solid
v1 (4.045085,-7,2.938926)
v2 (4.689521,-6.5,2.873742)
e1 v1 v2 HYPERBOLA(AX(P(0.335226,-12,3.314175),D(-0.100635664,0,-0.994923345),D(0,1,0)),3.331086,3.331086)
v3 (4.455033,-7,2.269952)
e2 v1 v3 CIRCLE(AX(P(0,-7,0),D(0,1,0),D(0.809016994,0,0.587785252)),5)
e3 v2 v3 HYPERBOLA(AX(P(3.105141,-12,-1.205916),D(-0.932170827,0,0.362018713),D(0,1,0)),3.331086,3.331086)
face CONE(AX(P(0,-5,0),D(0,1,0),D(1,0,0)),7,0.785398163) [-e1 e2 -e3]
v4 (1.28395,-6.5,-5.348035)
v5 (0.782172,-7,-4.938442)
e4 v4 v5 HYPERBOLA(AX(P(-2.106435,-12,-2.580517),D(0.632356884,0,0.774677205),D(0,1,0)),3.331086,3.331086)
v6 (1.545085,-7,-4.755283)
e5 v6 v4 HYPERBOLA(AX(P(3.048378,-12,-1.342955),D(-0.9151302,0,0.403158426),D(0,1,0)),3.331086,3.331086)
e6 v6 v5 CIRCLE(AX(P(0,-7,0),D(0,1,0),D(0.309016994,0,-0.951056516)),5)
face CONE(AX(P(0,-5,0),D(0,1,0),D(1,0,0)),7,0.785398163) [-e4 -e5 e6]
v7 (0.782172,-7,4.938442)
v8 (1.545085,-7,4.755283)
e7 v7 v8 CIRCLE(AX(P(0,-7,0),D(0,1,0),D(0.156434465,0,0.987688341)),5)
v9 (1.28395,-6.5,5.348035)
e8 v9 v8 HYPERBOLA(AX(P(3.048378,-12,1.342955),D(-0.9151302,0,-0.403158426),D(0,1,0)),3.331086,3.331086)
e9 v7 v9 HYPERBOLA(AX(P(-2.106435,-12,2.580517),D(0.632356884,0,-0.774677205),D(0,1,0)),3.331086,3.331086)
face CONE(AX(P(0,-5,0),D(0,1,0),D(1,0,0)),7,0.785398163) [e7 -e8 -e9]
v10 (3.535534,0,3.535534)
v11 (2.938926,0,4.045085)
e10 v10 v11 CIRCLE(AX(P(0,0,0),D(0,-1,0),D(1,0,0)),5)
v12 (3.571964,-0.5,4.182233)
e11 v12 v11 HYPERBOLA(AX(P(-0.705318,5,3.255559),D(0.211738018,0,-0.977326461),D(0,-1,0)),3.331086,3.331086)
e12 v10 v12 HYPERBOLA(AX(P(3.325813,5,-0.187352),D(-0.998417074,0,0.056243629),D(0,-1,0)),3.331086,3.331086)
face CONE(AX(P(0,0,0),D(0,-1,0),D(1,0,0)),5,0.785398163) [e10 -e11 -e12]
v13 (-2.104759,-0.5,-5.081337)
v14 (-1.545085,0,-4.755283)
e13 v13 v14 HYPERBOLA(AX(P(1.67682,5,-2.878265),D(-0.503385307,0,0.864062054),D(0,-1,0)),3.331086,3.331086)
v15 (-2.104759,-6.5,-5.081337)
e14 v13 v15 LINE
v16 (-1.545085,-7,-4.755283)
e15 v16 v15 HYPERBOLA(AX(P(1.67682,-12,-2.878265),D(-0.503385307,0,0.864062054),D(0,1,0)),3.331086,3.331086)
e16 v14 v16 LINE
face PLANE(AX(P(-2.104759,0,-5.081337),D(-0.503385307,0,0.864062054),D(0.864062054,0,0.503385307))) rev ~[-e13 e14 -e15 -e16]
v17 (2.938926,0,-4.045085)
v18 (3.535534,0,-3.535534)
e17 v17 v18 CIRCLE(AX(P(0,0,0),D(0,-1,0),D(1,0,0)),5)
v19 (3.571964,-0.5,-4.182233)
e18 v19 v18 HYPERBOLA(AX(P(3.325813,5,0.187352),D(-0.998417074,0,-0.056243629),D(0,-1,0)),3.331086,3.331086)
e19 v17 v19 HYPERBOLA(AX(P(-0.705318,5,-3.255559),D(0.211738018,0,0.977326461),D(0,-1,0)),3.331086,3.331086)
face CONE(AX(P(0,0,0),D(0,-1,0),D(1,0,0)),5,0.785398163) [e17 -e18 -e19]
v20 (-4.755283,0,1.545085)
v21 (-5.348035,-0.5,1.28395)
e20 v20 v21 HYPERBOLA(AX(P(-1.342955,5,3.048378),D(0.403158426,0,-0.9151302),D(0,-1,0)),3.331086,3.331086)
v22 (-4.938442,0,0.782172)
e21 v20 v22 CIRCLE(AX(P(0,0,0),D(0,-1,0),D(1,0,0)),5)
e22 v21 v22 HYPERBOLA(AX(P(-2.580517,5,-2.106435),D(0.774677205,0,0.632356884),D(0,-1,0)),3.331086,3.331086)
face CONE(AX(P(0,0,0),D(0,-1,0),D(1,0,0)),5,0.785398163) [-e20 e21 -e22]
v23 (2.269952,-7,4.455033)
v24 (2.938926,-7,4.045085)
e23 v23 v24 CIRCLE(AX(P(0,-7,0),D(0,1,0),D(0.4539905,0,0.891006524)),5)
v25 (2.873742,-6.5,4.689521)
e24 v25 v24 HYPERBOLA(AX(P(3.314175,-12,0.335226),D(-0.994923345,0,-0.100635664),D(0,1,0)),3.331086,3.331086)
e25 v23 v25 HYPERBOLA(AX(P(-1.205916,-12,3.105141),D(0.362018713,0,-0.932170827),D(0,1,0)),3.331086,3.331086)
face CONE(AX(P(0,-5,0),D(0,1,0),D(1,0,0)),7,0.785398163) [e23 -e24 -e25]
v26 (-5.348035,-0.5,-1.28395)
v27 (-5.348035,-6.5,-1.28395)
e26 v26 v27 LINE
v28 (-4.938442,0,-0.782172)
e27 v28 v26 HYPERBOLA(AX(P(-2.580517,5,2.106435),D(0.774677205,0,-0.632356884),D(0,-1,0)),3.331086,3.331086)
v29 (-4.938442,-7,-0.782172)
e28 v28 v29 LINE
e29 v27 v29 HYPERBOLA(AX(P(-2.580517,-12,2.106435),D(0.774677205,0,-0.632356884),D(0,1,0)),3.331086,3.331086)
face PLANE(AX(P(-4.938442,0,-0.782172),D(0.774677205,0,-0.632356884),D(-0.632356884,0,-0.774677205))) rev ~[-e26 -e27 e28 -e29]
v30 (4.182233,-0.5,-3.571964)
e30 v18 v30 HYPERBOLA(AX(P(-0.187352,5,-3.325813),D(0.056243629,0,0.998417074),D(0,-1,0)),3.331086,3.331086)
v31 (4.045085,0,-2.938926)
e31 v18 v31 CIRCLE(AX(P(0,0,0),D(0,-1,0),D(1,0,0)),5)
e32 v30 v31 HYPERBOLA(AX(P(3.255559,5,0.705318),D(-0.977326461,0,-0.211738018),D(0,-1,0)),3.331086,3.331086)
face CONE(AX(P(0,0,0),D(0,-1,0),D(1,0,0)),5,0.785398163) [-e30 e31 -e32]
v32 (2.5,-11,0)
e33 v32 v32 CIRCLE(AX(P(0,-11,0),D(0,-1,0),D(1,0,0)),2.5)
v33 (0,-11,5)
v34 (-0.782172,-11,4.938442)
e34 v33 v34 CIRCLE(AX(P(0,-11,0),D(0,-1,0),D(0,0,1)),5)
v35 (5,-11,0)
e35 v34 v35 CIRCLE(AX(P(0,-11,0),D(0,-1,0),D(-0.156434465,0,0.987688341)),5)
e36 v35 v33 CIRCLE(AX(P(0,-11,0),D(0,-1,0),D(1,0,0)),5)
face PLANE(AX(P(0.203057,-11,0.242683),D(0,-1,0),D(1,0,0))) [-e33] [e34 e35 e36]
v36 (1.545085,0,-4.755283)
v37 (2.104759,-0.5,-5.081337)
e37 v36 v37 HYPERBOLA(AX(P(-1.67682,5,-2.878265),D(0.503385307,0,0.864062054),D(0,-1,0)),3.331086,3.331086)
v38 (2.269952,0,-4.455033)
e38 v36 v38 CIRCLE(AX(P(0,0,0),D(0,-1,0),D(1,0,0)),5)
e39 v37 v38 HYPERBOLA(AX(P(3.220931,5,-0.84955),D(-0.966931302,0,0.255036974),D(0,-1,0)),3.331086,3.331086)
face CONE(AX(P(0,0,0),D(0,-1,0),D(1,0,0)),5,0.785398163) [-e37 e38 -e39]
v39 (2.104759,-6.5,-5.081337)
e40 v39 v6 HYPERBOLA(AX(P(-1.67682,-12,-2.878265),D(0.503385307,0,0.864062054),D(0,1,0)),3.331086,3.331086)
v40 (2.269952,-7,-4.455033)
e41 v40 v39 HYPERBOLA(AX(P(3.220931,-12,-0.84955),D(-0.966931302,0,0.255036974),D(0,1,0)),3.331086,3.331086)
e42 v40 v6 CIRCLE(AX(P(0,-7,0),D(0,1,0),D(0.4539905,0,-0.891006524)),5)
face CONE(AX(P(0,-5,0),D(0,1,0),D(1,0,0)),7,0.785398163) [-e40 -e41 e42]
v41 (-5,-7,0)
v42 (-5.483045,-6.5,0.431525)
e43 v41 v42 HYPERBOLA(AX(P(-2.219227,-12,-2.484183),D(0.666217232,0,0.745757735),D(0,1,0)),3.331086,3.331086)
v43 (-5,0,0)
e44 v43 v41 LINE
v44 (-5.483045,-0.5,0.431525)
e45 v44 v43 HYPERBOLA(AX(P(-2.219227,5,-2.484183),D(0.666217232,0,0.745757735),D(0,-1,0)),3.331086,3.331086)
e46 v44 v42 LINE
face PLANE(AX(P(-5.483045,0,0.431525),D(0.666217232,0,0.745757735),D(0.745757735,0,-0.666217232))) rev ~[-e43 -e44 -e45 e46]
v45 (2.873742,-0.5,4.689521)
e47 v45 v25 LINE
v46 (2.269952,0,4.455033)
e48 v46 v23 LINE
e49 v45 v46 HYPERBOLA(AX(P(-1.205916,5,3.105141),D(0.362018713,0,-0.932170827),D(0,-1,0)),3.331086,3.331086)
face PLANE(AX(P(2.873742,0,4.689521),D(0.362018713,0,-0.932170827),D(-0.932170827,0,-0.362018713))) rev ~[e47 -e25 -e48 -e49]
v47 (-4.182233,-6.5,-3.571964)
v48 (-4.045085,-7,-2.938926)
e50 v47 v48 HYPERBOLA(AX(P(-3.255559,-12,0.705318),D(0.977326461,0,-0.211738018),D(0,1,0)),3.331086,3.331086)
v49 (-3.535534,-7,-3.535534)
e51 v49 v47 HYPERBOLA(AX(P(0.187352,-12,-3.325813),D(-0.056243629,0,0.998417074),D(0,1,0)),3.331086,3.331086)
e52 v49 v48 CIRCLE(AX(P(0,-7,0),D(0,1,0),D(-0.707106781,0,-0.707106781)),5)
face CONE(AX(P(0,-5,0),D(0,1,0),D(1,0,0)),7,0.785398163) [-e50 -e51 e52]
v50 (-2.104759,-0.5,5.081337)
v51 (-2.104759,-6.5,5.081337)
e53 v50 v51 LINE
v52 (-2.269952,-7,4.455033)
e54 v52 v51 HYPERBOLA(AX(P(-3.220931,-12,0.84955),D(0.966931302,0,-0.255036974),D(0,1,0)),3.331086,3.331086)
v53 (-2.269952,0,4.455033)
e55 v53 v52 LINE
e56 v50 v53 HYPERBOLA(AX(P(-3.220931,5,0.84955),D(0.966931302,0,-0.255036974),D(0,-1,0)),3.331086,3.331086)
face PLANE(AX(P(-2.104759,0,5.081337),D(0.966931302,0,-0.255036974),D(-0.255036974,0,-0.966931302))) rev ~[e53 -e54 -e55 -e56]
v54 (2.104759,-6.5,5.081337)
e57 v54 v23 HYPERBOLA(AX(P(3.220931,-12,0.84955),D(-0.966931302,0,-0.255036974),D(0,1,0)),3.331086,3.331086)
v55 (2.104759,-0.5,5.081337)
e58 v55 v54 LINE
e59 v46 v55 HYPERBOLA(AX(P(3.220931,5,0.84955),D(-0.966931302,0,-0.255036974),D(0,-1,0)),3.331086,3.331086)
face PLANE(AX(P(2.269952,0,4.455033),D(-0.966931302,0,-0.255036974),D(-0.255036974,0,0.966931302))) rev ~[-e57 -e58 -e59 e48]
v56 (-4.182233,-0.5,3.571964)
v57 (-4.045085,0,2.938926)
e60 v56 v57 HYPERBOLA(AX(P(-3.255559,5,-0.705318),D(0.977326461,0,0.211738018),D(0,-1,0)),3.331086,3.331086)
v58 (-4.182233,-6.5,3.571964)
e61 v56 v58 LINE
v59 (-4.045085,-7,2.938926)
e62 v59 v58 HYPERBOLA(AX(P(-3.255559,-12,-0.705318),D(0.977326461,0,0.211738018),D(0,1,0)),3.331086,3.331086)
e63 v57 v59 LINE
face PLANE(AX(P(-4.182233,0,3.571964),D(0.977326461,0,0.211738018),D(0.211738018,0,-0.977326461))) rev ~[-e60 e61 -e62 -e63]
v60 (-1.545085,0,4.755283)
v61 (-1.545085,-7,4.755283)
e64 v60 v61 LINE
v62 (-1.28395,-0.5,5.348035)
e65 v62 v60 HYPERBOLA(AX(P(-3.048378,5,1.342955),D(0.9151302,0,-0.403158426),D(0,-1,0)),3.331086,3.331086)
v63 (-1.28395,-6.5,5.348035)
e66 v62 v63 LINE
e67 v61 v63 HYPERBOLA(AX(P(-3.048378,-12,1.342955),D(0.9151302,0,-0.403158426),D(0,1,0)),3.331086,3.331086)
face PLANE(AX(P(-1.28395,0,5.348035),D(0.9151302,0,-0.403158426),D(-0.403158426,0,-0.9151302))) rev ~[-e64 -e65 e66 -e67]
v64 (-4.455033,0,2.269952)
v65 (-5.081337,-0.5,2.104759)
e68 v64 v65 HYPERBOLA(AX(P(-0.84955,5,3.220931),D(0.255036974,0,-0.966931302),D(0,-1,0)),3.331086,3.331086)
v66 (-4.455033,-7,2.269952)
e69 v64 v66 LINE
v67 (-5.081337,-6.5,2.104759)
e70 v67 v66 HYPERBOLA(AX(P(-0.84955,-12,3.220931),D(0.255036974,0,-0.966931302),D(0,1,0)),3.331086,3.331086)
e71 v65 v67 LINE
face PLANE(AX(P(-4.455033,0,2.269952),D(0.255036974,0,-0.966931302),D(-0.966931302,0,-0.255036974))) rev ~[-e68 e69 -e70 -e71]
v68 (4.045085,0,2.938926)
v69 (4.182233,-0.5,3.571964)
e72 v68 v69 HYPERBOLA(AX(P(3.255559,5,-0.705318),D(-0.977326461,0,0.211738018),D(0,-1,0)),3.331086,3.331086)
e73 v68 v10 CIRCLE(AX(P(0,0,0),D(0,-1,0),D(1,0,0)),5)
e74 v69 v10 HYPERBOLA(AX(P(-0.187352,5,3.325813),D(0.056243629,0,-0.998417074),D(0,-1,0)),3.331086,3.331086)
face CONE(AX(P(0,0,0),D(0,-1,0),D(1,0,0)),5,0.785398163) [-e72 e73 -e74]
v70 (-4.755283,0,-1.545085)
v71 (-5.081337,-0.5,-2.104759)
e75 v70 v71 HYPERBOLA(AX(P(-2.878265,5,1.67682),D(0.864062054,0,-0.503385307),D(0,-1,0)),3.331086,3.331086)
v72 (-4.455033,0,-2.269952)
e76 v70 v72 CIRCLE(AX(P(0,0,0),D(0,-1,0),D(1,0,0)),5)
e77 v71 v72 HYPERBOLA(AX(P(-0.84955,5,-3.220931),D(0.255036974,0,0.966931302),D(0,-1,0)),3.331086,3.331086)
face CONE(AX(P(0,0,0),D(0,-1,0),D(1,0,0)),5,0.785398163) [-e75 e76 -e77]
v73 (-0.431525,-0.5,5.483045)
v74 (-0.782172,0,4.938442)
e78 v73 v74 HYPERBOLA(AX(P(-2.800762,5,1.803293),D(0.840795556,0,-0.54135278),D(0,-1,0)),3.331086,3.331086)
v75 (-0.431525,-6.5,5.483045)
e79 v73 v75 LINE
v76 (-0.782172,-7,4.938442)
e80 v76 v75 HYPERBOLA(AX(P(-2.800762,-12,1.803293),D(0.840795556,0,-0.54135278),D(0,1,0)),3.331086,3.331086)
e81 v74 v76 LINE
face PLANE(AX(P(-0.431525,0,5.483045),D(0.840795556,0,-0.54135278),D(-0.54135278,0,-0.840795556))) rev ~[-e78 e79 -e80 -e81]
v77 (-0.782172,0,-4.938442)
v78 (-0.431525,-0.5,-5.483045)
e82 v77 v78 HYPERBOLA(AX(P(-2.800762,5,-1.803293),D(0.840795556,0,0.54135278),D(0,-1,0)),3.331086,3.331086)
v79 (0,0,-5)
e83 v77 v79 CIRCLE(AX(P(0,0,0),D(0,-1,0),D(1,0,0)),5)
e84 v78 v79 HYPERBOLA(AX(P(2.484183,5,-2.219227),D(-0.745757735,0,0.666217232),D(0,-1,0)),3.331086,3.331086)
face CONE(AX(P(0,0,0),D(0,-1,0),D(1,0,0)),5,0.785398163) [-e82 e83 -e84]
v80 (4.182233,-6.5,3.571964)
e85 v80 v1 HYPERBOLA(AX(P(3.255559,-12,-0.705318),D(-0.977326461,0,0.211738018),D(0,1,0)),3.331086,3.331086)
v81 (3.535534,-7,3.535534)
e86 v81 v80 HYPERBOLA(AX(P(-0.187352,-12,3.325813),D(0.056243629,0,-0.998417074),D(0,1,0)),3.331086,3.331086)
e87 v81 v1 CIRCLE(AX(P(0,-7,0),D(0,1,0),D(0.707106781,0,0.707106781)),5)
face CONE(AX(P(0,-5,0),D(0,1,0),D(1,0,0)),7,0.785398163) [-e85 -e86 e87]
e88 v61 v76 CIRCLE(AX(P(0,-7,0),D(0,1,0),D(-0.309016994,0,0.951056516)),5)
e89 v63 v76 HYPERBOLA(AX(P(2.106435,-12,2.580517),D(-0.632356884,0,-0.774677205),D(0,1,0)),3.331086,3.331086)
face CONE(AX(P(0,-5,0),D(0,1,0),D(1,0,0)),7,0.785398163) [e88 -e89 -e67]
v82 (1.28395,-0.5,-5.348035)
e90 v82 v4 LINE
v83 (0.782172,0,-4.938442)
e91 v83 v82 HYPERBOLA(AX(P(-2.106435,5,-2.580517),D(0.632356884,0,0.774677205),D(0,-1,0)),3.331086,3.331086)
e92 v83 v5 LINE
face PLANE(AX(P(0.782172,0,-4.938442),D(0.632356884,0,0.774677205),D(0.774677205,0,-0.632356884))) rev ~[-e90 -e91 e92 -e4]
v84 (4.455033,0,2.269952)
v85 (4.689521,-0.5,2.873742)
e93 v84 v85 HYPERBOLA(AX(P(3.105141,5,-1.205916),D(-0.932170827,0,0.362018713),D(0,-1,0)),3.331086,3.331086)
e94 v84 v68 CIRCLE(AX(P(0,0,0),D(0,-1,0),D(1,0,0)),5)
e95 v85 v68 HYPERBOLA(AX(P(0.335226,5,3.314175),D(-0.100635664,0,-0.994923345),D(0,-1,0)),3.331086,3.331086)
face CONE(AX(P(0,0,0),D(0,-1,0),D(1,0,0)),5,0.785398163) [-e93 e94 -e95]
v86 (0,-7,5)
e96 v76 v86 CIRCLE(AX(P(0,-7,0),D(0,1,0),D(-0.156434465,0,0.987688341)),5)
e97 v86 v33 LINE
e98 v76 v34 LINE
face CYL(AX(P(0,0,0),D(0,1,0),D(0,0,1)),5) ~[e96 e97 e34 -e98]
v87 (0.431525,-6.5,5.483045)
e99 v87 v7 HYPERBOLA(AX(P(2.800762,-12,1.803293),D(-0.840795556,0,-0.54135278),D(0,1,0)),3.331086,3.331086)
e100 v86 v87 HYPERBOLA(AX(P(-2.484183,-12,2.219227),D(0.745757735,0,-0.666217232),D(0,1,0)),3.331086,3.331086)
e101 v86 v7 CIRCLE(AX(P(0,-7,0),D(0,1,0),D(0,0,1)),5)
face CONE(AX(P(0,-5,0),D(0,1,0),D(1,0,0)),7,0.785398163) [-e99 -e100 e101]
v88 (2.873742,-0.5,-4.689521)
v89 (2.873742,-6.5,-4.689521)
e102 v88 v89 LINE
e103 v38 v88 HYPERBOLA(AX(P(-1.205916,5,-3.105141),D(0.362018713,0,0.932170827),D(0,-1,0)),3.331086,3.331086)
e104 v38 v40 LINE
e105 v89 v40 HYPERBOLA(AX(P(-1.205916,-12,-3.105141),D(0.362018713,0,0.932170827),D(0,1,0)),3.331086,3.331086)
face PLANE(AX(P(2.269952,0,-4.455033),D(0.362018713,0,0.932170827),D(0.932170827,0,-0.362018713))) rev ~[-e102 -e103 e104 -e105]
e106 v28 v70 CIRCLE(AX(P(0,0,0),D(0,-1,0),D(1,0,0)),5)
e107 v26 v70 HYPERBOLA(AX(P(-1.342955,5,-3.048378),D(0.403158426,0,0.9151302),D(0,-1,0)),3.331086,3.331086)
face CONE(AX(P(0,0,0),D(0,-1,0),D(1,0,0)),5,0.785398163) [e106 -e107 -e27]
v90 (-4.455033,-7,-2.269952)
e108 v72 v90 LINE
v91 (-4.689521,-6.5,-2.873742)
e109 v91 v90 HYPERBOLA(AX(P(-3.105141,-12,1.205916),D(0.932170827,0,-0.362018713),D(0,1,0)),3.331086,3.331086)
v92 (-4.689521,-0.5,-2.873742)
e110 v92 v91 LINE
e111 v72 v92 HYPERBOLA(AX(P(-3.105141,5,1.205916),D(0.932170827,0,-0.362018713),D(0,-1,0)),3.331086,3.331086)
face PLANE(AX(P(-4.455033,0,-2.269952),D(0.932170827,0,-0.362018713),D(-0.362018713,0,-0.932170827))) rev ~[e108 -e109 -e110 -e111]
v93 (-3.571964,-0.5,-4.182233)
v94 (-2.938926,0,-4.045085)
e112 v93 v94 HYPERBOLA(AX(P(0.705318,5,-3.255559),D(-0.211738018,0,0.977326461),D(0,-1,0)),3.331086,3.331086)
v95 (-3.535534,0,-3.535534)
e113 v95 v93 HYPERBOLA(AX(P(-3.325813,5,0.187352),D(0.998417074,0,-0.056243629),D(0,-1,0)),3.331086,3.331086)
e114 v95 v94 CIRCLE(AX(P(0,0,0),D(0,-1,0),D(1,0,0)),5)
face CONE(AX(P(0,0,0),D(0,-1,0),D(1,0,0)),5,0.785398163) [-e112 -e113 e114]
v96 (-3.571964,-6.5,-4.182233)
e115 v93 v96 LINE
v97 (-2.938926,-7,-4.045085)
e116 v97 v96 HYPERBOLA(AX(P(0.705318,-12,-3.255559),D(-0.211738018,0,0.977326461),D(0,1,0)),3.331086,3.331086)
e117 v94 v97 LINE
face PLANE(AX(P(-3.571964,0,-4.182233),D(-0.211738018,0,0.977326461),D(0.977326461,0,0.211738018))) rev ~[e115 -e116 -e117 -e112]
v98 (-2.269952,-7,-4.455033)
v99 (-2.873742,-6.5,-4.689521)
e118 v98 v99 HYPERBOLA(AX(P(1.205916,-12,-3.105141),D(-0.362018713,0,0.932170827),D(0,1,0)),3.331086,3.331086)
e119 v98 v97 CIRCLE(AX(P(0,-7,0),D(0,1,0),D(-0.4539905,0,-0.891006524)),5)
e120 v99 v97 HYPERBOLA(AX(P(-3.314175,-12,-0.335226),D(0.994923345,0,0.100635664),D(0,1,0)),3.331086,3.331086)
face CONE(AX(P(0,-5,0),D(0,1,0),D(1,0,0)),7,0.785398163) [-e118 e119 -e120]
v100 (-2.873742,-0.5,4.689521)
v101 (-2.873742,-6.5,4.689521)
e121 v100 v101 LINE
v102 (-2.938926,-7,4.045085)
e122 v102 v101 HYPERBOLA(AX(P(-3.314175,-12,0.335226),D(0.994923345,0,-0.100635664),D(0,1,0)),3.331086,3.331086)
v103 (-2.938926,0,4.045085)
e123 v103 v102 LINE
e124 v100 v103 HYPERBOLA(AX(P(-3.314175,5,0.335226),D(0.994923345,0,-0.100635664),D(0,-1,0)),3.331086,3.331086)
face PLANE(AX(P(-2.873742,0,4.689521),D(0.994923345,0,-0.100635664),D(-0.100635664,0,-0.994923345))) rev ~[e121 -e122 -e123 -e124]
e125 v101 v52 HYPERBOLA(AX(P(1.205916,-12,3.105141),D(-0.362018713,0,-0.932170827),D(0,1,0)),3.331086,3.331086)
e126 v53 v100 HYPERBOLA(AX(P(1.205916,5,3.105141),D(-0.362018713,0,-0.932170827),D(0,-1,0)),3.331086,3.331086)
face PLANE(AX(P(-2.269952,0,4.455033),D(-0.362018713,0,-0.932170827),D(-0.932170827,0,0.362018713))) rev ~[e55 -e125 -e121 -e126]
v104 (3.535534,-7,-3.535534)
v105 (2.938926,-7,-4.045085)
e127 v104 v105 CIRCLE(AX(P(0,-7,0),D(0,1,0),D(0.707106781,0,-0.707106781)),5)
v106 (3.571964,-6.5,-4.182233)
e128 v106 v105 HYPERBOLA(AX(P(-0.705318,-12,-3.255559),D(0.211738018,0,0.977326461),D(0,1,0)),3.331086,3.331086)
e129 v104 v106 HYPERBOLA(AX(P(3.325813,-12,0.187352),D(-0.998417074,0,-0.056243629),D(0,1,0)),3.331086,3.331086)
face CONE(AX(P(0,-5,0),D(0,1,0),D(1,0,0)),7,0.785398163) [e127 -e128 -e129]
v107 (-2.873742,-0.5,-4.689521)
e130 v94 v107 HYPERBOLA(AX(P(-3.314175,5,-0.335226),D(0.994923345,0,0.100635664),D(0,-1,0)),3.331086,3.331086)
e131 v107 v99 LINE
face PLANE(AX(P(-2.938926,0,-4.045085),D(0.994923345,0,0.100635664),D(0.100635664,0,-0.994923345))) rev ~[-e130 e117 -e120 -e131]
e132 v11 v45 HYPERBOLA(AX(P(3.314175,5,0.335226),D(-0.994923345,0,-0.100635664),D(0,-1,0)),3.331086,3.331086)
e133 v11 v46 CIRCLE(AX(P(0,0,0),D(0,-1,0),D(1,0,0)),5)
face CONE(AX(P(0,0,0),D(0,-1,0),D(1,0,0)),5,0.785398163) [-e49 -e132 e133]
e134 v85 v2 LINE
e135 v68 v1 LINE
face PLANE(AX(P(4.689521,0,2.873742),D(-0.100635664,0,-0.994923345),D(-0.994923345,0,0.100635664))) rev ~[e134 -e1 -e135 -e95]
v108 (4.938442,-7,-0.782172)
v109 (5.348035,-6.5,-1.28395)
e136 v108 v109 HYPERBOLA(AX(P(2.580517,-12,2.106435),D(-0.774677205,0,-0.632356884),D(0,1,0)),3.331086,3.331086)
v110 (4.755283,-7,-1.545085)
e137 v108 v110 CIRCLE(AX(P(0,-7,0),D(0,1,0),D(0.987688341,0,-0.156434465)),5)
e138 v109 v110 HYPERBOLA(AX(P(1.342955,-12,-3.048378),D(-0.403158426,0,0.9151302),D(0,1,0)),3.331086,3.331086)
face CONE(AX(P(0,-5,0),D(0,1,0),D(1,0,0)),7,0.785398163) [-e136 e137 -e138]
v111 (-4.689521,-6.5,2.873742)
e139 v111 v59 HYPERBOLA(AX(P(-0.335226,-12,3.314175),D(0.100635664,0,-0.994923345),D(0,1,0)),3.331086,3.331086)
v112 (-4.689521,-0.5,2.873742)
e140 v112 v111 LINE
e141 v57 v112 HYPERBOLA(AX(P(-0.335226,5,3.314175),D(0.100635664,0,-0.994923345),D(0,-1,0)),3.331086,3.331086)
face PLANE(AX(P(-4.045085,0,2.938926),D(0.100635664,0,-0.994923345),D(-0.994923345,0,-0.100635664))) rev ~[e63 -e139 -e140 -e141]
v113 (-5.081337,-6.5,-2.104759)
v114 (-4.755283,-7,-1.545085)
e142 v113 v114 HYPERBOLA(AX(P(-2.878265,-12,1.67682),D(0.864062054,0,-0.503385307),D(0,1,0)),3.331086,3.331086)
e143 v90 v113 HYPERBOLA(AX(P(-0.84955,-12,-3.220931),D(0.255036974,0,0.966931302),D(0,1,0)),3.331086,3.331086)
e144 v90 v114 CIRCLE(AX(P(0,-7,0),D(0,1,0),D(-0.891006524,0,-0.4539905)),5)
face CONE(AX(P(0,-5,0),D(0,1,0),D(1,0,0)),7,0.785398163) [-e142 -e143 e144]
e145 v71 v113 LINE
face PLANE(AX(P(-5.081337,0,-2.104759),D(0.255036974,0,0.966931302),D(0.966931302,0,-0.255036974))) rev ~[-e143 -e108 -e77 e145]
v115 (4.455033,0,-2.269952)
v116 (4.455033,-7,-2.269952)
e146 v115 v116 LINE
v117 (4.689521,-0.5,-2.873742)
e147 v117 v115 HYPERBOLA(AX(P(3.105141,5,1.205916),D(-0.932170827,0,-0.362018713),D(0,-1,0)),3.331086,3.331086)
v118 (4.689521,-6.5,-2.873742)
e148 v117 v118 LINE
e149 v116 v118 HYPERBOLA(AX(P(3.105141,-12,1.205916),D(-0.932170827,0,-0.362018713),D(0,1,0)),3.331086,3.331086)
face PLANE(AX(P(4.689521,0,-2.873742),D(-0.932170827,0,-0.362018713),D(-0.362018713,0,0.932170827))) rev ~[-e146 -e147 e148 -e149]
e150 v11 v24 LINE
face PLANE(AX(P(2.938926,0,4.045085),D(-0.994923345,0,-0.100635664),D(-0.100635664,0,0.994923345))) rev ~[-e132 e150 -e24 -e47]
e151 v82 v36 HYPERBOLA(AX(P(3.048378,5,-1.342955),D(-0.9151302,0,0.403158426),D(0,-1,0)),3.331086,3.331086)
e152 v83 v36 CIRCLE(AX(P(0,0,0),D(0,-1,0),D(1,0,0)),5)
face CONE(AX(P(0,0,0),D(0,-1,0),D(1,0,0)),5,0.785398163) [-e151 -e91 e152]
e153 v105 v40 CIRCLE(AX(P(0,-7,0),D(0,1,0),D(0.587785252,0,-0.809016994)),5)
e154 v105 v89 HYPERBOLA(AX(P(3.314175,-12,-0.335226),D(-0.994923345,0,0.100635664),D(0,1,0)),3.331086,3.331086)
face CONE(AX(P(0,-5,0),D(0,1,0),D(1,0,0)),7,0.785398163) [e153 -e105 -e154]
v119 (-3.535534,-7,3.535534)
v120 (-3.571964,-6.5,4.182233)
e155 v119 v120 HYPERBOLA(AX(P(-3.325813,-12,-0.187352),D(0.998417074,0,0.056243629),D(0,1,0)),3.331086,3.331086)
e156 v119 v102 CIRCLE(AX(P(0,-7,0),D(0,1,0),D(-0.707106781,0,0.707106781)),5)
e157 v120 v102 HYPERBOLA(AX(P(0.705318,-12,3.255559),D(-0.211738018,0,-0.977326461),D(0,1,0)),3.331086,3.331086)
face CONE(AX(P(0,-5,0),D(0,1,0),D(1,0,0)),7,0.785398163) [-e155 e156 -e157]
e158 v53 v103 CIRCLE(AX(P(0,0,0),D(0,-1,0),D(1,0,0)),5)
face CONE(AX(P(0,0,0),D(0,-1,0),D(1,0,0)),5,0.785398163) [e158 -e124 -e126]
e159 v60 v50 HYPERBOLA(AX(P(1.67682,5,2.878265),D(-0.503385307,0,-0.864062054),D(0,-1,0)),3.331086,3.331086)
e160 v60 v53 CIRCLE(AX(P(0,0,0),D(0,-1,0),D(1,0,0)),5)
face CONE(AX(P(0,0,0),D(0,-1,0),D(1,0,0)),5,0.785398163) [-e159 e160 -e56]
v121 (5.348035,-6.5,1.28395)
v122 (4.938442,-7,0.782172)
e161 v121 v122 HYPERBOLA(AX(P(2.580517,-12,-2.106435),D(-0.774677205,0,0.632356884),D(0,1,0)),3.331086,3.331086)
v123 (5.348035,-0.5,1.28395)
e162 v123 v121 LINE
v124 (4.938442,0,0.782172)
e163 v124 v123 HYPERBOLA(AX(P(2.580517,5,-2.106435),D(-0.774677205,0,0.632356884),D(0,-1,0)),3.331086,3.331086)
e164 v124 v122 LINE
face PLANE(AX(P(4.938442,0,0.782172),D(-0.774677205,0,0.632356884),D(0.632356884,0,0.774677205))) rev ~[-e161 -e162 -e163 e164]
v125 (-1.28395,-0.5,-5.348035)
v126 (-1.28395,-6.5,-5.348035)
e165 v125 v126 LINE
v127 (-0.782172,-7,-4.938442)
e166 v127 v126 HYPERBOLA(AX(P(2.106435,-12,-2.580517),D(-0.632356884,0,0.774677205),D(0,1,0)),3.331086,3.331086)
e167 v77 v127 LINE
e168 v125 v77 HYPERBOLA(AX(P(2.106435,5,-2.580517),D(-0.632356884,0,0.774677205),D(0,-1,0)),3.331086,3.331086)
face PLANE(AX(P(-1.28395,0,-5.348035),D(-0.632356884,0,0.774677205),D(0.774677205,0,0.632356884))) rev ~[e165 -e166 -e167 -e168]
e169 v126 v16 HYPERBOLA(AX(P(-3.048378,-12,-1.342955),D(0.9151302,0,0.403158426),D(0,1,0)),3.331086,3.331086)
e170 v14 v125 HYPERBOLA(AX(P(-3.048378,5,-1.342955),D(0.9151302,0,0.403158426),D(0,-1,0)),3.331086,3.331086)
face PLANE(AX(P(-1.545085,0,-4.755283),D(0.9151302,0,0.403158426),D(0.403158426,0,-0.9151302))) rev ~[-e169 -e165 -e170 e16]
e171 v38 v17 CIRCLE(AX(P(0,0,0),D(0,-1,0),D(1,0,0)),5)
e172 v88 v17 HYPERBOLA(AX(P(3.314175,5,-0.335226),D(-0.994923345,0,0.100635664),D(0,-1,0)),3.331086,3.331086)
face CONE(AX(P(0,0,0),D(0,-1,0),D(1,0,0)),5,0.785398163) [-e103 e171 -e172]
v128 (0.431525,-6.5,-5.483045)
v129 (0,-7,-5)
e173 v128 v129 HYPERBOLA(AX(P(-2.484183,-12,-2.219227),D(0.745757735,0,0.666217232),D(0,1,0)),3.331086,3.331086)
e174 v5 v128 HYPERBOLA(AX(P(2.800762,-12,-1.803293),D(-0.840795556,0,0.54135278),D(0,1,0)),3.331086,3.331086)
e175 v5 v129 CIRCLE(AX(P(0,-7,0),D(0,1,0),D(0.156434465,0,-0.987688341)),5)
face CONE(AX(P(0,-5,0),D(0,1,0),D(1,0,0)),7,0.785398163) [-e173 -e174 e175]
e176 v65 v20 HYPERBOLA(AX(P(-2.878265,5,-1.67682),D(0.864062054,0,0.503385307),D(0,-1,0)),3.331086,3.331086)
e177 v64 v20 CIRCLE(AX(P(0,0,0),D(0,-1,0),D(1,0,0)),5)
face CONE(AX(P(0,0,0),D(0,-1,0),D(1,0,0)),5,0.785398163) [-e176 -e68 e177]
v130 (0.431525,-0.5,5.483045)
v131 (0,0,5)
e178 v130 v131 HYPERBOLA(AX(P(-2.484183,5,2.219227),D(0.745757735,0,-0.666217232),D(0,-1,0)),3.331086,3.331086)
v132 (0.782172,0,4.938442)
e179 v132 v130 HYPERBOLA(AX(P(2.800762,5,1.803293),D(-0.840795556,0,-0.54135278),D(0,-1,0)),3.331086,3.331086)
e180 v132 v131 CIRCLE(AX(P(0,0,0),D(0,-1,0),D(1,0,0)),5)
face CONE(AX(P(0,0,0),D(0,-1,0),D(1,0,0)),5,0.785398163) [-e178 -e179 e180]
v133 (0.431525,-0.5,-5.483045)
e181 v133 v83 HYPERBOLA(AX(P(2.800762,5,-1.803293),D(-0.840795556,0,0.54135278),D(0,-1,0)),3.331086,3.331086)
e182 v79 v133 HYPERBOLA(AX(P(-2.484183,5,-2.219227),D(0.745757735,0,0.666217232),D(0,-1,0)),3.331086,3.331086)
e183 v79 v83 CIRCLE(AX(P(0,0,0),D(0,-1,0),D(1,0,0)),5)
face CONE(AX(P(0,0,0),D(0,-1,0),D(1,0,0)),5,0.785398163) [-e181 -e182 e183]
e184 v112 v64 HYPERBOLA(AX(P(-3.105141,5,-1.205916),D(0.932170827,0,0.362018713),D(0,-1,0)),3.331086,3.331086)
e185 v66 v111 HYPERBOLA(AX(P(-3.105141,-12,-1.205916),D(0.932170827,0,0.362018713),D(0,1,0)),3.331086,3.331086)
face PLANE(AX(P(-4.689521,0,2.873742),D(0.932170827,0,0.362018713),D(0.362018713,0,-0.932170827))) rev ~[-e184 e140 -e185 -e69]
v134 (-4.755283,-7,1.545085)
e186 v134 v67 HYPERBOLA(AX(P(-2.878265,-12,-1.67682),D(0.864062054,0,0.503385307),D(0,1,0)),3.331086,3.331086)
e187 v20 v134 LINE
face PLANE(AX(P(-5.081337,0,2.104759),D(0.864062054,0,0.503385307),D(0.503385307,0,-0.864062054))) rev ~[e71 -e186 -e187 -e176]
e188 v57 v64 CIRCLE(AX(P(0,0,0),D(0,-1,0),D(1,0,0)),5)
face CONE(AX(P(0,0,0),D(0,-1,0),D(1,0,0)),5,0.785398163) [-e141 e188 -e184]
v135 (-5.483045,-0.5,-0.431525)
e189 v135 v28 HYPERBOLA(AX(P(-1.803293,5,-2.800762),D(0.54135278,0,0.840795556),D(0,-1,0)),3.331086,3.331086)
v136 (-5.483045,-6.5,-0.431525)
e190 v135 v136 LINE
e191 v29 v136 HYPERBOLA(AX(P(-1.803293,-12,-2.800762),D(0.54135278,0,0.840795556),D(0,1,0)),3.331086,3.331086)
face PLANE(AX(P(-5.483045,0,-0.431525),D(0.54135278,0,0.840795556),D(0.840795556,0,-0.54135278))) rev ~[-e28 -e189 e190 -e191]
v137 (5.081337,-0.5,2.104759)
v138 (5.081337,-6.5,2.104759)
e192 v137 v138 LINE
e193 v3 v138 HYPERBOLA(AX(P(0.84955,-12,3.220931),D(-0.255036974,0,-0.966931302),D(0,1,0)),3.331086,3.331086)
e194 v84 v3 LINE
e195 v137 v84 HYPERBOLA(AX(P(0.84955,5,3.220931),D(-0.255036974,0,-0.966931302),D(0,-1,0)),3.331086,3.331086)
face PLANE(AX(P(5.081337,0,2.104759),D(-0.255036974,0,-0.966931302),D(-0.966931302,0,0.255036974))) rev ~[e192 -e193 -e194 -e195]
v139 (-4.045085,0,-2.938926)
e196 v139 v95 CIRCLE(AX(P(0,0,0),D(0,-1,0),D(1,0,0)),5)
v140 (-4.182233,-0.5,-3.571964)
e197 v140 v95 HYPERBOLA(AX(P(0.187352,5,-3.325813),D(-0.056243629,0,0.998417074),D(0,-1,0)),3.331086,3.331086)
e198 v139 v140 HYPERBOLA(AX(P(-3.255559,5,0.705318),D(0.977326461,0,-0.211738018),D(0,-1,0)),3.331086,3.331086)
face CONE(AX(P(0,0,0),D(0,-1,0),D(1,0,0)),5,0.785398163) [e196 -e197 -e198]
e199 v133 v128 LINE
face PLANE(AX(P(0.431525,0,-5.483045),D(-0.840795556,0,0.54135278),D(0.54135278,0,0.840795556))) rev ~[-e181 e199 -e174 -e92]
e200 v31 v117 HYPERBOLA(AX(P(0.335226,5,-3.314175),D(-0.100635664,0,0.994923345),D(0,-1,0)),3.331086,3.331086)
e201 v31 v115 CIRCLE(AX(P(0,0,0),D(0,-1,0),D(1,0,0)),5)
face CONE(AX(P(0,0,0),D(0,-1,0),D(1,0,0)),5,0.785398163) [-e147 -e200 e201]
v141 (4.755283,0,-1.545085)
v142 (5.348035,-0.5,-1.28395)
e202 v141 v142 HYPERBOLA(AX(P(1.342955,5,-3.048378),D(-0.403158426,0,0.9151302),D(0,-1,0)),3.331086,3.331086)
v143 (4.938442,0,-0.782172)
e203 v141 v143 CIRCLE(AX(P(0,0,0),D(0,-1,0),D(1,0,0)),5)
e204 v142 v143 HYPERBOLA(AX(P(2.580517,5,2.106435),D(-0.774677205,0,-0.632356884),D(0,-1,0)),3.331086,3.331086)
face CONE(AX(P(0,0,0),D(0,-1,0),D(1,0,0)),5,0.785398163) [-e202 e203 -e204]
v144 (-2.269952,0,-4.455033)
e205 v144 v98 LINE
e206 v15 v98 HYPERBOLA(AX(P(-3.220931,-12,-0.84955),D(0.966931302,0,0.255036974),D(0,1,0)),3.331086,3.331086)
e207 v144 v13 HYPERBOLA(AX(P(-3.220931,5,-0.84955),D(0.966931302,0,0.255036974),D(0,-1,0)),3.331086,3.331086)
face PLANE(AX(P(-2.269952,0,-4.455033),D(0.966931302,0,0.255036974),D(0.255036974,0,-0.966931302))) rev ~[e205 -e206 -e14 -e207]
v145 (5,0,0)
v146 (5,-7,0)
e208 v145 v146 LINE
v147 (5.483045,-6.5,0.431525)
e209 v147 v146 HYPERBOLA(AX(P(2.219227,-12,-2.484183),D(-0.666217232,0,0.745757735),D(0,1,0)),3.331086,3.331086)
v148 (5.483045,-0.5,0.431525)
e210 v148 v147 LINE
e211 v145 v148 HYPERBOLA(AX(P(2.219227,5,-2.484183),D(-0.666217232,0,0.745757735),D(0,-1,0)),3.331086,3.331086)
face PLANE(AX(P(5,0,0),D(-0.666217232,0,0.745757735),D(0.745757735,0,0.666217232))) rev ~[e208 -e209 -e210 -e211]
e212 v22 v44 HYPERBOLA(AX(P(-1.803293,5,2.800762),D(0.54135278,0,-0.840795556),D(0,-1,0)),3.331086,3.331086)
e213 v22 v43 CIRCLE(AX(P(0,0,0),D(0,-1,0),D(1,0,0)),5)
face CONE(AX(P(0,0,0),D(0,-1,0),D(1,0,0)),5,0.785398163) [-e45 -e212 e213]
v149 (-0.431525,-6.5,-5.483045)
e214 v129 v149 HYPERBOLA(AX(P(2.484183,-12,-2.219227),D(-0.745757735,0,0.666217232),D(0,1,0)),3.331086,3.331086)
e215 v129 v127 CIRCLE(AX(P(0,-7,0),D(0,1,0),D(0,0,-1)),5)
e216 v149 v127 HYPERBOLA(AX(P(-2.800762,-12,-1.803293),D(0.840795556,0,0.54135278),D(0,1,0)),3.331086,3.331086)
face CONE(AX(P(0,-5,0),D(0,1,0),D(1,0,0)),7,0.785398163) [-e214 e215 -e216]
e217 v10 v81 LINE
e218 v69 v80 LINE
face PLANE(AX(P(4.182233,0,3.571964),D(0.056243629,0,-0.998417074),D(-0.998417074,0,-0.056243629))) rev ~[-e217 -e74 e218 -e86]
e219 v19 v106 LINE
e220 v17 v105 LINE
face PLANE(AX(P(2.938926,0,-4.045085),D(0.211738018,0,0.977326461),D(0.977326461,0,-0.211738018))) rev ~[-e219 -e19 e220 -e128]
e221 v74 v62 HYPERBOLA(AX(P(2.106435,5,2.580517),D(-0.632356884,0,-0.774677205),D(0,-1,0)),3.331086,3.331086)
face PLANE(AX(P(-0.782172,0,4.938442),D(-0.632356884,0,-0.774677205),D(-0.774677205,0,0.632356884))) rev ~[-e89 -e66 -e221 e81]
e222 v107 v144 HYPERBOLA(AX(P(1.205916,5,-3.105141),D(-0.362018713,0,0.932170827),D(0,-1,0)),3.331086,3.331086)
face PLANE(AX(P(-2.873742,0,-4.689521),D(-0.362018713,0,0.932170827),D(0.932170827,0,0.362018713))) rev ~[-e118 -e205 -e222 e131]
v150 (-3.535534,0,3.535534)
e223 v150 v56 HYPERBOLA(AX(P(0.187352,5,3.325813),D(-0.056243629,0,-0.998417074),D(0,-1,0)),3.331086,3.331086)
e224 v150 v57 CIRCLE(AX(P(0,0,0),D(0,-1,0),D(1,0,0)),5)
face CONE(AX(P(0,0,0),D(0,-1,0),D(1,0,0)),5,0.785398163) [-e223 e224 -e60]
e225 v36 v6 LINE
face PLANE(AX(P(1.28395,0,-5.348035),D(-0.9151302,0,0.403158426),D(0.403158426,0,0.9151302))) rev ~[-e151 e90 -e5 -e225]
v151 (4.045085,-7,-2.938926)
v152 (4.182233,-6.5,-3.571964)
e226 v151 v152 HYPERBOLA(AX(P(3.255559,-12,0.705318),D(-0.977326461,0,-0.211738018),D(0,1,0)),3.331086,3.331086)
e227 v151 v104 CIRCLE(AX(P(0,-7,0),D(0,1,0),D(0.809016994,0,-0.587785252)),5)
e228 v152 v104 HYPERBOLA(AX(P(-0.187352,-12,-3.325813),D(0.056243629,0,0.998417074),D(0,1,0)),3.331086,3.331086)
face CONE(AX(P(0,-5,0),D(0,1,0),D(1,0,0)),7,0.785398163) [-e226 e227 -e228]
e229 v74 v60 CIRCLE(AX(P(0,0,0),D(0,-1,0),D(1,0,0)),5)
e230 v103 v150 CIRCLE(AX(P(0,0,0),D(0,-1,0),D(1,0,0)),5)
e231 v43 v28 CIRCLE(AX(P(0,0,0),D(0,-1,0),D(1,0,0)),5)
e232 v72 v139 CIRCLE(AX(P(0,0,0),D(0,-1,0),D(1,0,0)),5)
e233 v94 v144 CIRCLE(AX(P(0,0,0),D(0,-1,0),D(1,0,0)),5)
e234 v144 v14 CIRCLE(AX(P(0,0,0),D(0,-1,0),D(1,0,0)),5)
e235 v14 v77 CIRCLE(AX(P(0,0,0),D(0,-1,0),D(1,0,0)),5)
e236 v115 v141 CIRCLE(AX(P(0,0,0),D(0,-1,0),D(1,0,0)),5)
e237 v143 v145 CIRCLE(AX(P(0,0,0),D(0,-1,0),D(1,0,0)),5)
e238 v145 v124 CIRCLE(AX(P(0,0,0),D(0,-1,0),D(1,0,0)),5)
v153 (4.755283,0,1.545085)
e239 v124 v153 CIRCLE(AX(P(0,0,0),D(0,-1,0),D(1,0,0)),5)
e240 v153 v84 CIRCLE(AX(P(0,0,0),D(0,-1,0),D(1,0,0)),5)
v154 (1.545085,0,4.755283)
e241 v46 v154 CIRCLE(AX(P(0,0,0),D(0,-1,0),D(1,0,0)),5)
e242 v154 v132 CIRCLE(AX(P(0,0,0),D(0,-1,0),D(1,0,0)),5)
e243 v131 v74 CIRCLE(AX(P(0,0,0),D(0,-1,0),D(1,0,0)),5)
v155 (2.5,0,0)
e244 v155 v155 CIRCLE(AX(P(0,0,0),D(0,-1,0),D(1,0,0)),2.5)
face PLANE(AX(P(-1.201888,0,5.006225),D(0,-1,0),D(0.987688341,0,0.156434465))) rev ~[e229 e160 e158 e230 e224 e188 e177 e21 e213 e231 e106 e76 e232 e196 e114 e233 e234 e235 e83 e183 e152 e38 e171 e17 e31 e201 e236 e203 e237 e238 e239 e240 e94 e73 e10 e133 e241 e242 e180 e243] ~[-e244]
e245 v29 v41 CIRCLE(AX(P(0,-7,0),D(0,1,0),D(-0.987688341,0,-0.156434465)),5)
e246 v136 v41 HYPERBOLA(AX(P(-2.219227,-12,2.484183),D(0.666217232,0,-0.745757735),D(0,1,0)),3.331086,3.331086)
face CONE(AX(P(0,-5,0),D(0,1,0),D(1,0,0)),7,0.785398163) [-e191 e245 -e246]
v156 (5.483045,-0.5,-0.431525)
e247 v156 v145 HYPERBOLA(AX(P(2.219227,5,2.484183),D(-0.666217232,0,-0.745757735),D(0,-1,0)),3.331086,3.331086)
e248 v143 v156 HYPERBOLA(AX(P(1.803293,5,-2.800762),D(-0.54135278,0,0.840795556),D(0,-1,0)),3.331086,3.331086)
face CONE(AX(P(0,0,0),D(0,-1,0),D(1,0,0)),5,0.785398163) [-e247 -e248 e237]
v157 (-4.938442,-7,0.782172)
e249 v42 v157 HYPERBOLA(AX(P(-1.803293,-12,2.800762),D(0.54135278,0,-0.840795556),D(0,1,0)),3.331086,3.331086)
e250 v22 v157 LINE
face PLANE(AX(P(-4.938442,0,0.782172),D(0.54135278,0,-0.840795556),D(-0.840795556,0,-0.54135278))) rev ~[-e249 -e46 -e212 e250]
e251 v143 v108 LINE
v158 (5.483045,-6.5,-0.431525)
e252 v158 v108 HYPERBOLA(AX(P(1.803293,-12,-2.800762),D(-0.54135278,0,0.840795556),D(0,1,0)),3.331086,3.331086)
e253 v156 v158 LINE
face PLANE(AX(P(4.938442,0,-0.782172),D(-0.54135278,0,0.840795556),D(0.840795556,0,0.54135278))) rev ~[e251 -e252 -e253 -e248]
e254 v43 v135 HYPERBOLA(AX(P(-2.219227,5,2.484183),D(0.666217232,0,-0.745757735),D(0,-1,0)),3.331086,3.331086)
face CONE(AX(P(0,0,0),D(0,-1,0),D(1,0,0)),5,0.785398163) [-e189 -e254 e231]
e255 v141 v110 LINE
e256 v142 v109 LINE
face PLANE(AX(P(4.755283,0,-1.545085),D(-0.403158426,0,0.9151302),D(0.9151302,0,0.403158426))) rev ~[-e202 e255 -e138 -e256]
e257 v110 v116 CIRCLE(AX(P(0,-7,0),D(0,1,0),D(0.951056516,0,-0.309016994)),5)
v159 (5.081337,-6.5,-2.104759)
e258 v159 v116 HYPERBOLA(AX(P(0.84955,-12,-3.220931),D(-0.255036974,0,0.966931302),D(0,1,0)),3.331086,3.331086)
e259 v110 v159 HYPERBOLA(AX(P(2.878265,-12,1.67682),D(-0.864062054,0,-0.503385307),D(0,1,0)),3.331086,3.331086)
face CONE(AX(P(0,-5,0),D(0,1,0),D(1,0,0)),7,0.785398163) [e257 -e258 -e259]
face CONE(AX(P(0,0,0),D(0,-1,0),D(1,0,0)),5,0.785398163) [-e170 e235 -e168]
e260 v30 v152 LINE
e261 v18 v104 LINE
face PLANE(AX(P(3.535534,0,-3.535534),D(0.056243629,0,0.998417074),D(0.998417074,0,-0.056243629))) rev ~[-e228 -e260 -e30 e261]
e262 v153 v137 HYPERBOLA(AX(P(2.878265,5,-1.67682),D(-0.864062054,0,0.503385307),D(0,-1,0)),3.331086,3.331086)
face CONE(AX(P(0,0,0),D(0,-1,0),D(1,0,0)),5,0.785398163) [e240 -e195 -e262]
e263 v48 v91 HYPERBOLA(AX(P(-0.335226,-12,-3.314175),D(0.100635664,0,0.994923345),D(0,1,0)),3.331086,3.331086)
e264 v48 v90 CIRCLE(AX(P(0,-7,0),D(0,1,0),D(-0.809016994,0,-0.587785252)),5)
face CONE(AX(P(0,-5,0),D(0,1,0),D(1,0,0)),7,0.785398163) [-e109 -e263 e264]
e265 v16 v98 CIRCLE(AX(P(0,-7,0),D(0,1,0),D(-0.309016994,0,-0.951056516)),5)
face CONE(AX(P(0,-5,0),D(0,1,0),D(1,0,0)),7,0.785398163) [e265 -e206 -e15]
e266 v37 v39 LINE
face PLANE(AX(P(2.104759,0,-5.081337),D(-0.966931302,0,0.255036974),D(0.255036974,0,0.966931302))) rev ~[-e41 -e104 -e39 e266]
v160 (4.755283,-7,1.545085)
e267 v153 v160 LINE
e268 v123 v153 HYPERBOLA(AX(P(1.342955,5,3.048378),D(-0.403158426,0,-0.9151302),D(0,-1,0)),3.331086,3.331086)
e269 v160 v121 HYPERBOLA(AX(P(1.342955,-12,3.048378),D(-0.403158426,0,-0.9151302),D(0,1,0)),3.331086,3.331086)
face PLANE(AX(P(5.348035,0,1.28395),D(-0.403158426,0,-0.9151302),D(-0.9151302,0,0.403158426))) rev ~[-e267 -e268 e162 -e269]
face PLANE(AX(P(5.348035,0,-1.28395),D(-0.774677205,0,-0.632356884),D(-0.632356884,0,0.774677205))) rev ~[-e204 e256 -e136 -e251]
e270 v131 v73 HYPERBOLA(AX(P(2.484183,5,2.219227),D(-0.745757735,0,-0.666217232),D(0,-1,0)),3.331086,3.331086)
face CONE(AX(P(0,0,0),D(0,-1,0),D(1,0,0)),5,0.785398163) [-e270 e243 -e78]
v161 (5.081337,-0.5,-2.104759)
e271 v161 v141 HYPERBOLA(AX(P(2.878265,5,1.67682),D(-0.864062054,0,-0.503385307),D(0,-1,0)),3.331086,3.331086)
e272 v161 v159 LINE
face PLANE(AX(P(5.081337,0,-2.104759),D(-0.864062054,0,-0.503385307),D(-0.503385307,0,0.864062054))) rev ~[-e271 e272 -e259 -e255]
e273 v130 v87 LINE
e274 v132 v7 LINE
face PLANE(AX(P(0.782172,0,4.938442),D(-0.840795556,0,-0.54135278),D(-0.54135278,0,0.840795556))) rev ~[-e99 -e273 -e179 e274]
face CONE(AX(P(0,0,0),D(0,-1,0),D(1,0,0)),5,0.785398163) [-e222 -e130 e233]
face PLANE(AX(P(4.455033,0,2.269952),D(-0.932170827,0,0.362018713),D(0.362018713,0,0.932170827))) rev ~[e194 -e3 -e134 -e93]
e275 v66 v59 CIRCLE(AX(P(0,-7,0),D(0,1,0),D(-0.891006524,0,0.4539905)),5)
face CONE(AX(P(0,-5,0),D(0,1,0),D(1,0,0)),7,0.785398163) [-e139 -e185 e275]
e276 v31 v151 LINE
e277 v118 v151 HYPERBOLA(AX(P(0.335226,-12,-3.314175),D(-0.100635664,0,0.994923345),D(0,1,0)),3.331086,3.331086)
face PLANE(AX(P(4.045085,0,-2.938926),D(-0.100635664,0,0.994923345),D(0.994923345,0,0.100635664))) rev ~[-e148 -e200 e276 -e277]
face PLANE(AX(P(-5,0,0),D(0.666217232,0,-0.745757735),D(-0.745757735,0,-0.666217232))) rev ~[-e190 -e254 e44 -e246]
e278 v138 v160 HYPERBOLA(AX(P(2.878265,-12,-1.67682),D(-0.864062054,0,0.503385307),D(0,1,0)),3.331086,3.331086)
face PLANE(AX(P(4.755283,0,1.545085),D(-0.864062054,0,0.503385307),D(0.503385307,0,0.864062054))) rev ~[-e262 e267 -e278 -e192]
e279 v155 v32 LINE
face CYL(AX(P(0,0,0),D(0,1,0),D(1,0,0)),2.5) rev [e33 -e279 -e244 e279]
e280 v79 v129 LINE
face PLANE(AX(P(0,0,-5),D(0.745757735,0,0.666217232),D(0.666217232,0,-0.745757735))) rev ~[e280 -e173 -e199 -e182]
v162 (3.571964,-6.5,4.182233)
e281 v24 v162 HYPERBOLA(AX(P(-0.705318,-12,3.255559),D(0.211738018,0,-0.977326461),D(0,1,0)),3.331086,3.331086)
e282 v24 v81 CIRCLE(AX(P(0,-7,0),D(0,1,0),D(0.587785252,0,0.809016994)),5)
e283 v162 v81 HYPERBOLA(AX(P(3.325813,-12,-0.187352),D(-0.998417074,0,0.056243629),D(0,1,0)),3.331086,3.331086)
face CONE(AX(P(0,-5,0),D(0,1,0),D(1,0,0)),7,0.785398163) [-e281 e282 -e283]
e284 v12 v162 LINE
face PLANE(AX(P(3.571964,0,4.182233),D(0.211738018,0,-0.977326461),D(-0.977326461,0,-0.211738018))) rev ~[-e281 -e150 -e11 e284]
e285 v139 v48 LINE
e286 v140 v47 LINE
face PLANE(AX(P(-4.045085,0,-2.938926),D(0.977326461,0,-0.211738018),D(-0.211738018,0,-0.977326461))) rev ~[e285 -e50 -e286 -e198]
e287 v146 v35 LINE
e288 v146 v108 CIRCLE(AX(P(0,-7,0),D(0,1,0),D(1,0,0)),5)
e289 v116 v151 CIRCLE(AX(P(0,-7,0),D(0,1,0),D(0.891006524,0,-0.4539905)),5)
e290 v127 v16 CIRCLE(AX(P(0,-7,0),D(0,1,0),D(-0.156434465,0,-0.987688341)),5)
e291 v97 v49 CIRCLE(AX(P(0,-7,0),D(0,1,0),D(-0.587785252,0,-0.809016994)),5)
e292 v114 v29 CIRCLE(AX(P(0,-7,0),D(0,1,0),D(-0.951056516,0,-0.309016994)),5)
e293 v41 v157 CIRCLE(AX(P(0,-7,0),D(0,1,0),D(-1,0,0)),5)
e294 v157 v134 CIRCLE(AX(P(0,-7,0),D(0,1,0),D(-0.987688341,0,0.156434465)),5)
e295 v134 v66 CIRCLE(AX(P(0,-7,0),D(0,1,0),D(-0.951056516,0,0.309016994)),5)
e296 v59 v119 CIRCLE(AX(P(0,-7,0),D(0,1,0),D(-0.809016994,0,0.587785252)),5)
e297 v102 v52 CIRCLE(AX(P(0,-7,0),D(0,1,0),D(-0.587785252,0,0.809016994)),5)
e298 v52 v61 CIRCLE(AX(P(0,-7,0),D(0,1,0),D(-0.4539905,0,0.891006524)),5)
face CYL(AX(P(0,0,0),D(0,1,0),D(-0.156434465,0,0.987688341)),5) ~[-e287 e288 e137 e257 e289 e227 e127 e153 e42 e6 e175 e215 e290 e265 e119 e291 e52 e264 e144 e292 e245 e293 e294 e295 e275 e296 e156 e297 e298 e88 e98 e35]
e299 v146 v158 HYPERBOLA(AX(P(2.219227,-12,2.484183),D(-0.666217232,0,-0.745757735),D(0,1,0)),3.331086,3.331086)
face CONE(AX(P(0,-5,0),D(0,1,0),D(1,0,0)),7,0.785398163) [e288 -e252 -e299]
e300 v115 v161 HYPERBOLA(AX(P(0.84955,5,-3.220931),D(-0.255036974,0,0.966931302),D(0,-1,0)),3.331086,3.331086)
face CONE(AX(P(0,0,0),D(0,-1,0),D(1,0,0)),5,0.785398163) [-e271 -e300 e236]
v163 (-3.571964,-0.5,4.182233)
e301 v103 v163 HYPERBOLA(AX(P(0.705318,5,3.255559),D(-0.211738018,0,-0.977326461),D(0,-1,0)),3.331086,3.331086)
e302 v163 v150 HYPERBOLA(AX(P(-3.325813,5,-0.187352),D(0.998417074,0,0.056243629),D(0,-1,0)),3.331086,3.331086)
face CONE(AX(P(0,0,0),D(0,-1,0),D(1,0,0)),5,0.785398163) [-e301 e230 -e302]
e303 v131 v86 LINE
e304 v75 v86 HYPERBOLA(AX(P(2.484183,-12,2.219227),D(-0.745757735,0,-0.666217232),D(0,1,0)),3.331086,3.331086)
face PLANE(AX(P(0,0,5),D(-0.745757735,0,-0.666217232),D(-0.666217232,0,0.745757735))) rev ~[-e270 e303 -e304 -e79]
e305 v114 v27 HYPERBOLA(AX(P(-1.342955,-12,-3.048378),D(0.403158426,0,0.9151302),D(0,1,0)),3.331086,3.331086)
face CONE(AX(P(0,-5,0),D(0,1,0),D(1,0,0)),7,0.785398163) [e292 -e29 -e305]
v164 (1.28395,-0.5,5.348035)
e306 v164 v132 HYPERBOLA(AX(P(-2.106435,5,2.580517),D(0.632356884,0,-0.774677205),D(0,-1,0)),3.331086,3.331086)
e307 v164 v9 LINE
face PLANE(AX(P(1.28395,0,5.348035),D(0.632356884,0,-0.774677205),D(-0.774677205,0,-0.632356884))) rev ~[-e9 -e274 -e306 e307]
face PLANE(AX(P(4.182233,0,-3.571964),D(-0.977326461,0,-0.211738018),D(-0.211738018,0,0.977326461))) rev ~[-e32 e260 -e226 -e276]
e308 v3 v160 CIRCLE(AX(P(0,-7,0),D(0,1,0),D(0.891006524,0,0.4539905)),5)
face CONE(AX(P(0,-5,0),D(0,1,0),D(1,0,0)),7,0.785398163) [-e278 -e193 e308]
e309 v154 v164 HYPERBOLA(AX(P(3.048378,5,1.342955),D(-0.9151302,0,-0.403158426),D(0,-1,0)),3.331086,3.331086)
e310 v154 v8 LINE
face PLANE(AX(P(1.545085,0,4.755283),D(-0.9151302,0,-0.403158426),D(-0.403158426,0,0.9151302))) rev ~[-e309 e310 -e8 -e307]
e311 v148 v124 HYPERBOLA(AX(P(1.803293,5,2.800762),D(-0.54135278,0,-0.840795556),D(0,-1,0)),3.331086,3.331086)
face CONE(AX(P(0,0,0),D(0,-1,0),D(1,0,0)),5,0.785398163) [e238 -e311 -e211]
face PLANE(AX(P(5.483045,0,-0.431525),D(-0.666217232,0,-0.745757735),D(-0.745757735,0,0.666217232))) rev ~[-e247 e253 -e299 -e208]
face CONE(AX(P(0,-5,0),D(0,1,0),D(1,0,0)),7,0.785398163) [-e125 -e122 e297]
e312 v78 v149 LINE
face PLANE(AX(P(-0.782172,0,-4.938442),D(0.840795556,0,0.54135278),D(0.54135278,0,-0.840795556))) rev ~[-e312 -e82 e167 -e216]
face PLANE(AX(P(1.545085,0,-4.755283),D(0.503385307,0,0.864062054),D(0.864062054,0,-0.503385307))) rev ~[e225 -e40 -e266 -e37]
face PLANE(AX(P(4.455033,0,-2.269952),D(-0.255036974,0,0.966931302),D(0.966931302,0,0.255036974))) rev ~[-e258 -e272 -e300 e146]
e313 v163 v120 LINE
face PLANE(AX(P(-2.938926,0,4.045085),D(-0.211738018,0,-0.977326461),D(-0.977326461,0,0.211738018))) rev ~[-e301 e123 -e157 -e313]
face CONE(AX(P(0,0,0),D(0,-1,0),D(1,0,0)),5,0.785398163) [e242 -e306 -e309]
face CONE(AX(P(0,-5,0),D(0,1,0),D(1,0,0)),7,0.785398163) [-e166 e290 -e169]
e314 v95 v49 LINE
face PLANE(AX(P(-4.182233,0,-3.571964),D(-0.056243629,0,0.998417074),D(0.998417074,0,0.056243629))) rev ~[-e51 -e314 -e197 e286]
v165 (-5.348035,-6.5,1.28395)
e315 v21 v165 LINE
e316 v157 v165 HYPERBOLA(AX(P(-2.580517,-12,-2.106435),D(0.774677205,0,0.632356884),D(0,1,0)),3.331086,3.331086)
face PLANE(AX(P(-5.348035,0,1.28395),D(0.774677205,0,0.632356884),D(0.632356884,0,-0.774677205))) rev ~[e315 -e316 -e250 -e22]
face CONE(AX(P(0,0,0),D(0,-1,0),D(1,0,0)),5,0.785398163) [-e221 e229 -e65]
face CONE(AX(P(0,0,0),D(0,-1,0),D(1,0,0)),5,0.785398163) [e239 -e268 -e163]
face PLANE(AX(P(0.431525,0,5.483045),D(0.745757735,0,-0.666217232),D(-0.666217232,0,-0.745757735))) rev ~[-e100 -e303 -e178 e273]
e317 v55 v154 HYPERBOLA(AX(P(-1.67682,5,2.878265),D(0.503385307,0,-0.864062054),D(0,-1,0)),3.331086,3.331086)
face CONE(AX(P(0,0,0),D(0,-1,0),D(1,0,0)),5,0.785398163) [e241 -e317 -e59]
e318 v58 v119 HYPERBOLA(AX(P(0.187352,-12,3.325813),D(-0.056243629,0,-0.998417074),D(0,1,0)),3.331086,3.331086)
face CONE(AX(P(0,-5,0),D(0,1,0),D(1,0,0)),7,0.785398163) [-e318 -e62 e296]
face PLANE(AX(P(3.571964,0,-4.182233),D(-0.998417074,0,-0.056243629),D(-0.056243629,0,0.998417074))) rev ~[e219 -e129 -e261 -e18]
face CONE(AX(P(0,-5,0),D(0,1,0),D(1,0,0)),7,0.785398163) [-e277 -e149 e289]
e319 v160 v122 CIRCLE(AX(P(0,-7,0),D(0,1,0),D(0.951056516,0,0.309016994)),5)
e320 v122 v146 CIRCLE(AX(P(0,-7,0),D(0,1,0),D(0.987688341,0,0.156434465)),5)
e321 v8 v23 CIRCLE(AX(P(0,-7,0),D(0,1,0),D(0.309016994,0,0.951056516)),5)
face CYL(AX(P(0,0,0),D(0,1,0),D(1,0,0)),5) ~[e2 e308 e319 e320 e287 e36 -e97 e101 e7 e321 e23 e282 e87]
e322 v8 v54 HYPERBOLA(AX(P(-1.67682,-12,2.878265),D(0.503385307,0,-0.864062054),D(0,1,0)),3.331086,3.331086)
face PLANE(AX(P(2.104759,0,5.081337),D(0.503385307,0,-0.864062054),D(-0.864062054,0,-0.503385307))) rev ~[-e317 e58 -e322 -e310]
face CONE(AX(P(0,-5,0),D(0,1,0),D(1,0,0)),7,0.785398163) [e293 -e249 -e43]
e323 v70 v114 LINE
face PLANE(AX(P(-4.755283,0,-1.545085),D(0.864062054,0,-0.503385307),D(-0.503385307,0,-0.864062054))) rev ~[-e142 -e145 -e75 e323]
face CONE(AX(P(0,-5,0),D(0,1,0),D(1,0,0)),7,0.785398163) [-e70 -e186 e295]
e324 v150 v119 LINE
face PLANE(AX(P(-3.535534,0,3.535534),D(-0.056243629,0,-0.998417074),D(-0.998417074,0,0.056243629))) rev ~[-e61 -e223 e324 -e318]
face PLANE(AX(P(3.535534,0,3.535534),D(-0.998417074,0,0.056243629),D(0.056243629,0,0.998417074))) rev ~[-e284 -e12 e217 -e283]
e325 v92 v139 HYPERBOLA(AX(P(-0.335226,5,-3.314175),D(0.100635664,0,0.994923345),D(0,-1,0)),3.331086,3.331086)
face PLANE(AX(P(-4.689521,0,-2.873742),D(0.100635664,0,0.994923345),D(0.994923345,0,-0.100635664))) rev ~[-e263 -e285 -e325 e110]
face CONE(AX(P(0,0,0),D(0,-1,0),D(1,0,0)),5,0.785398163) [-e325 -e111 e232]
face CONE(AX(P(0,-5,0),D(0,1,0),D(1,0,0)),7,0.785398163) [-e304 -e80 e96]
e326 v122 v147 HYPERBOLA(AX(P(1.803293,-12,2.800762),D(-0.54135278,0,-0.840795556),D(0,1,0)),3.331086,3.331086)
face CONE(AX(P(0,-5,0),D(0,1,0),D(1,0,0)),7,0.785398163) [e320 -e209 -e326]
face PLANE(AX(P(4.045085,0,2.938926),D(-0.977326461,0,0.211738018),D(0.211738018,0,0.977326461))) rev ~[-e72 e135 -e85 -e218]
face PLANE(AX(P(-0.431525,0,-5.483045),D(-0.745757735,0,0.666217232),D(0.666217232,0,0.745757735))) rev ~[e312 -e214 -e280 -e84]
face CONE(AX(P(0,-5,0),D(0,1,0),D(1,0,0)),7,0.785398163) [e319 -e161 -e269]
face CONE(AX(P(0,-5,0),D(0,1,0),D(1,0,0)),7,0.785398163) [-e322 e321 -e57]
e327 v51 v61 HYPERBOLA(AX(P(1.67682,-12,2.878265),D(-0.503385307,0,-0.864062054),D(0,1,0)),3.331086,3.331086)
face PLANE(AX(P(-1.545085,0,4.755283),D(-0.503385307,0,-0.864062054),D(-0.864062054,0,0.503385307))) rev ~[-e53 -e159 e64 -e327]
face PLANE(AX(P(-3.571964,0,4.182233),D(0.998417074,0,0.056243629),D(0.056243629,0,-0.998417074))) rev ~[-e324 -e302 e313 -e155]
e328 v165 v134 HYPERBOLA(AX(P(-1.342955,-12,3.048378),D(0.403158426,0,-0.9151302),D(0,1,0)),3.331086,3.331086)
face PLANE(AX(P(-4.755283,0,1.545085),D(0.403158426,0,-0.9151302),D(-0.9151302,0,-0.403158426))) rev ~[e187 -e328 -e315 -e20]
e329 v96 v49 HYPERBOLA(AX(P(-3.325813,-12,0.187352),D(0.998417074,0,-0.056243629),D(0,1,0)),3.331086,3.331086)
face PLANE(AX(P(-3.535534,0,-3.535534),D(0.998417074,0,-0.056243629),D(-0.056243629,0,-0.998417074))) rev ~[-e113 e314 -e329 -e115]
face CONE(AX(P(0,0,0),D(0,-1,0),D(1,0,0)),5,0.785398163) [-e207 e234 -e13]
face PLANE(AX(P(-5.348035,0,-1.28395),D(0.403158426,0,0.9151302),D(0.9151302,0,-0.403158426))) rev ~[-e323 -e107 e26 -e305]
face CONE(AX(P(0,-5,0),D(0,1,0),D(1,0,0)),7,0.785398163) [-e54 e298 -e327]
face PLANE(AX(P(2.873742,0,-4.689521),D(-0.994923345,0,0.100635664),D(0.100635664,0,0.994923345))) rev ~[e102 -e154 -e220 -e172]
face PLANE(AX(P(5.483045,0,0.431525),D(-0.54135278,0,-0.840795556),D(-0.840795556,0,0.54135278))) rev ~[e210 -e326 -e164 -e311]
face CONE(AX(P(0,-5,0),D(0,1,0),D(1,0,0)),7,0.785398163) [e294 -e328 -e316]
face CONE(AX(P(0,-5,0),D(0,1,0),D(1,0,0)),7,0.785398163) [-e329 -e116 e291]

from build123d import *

# Parameters (mm, degrees)
F0_R            = 2.5
F1_DEPTH        = 11
F2_DEPTH        = 7
F2_COPIES_COUNT = 40


# Not quite as in the source:
# - a pattern or mirror of a feature is missing from the dataset's text; its kind, count and spacing are read off the source's solid


with BuildPart() as f1:
    # F0 (on Front) → F1 (new body)
    with BuildSketch(Plane.XZ):
        with BuildLine():
            ThreePointArc((-0.7821723252, 4.938441703), (-3.2472402417, -3.802029828), (5, 0))
            ThreePointArc((5, 0), (3.5355339059, 3.5355339059), (0, 5))
            ThreePointArc((0, 5), (-0.3922954786, 4.9845866687), (-0.7821723252, 4.938441703))
        make_face()
        Circle(F0_R, mode=Mode.SUBTRACT)
    extrude(amount=F1_DEPTH)

    # F0 (on Front) → F2 (join)
    with BuildSketch(Plane.XZ):
        with BuildLine():
            ThreePointArc((-0.7821723252, 4.938441703), (-0.3922954786, 4.9845866687), (0, 5))
            Line((0, 5), (-0.4315250265, 5.4830453355))
            Line((-0.4315250265, 5.4830453355), (-0.7821723252, 4.938441703))
        make_face()
    f2 = extrude(amount=F2_DEPTH)

    # F2_copies: F2 ×40 about axis
    f2_copies_axis = Axis((0, 0, 0), (0, 1, 0))
    for i in range(1, F2_COPIES_COUNT):
        add(f2.rotate(f2_copies_axis, i * 360 / F2_COPIES_COUNT))

    # F3 (on Top) → F4 (revolve, cut)
    with BuildSketch(Plane.XY):
        Polygon((8, 0), (5, 0), (7, -2), (7, -5), (5, -7), (8, -7), align=None)
    revolve(axis=Axis((0, -7.7233230695, 0), (0, -1, 0)), mode=Mode.SUBTRACT)


solid = f1.part
